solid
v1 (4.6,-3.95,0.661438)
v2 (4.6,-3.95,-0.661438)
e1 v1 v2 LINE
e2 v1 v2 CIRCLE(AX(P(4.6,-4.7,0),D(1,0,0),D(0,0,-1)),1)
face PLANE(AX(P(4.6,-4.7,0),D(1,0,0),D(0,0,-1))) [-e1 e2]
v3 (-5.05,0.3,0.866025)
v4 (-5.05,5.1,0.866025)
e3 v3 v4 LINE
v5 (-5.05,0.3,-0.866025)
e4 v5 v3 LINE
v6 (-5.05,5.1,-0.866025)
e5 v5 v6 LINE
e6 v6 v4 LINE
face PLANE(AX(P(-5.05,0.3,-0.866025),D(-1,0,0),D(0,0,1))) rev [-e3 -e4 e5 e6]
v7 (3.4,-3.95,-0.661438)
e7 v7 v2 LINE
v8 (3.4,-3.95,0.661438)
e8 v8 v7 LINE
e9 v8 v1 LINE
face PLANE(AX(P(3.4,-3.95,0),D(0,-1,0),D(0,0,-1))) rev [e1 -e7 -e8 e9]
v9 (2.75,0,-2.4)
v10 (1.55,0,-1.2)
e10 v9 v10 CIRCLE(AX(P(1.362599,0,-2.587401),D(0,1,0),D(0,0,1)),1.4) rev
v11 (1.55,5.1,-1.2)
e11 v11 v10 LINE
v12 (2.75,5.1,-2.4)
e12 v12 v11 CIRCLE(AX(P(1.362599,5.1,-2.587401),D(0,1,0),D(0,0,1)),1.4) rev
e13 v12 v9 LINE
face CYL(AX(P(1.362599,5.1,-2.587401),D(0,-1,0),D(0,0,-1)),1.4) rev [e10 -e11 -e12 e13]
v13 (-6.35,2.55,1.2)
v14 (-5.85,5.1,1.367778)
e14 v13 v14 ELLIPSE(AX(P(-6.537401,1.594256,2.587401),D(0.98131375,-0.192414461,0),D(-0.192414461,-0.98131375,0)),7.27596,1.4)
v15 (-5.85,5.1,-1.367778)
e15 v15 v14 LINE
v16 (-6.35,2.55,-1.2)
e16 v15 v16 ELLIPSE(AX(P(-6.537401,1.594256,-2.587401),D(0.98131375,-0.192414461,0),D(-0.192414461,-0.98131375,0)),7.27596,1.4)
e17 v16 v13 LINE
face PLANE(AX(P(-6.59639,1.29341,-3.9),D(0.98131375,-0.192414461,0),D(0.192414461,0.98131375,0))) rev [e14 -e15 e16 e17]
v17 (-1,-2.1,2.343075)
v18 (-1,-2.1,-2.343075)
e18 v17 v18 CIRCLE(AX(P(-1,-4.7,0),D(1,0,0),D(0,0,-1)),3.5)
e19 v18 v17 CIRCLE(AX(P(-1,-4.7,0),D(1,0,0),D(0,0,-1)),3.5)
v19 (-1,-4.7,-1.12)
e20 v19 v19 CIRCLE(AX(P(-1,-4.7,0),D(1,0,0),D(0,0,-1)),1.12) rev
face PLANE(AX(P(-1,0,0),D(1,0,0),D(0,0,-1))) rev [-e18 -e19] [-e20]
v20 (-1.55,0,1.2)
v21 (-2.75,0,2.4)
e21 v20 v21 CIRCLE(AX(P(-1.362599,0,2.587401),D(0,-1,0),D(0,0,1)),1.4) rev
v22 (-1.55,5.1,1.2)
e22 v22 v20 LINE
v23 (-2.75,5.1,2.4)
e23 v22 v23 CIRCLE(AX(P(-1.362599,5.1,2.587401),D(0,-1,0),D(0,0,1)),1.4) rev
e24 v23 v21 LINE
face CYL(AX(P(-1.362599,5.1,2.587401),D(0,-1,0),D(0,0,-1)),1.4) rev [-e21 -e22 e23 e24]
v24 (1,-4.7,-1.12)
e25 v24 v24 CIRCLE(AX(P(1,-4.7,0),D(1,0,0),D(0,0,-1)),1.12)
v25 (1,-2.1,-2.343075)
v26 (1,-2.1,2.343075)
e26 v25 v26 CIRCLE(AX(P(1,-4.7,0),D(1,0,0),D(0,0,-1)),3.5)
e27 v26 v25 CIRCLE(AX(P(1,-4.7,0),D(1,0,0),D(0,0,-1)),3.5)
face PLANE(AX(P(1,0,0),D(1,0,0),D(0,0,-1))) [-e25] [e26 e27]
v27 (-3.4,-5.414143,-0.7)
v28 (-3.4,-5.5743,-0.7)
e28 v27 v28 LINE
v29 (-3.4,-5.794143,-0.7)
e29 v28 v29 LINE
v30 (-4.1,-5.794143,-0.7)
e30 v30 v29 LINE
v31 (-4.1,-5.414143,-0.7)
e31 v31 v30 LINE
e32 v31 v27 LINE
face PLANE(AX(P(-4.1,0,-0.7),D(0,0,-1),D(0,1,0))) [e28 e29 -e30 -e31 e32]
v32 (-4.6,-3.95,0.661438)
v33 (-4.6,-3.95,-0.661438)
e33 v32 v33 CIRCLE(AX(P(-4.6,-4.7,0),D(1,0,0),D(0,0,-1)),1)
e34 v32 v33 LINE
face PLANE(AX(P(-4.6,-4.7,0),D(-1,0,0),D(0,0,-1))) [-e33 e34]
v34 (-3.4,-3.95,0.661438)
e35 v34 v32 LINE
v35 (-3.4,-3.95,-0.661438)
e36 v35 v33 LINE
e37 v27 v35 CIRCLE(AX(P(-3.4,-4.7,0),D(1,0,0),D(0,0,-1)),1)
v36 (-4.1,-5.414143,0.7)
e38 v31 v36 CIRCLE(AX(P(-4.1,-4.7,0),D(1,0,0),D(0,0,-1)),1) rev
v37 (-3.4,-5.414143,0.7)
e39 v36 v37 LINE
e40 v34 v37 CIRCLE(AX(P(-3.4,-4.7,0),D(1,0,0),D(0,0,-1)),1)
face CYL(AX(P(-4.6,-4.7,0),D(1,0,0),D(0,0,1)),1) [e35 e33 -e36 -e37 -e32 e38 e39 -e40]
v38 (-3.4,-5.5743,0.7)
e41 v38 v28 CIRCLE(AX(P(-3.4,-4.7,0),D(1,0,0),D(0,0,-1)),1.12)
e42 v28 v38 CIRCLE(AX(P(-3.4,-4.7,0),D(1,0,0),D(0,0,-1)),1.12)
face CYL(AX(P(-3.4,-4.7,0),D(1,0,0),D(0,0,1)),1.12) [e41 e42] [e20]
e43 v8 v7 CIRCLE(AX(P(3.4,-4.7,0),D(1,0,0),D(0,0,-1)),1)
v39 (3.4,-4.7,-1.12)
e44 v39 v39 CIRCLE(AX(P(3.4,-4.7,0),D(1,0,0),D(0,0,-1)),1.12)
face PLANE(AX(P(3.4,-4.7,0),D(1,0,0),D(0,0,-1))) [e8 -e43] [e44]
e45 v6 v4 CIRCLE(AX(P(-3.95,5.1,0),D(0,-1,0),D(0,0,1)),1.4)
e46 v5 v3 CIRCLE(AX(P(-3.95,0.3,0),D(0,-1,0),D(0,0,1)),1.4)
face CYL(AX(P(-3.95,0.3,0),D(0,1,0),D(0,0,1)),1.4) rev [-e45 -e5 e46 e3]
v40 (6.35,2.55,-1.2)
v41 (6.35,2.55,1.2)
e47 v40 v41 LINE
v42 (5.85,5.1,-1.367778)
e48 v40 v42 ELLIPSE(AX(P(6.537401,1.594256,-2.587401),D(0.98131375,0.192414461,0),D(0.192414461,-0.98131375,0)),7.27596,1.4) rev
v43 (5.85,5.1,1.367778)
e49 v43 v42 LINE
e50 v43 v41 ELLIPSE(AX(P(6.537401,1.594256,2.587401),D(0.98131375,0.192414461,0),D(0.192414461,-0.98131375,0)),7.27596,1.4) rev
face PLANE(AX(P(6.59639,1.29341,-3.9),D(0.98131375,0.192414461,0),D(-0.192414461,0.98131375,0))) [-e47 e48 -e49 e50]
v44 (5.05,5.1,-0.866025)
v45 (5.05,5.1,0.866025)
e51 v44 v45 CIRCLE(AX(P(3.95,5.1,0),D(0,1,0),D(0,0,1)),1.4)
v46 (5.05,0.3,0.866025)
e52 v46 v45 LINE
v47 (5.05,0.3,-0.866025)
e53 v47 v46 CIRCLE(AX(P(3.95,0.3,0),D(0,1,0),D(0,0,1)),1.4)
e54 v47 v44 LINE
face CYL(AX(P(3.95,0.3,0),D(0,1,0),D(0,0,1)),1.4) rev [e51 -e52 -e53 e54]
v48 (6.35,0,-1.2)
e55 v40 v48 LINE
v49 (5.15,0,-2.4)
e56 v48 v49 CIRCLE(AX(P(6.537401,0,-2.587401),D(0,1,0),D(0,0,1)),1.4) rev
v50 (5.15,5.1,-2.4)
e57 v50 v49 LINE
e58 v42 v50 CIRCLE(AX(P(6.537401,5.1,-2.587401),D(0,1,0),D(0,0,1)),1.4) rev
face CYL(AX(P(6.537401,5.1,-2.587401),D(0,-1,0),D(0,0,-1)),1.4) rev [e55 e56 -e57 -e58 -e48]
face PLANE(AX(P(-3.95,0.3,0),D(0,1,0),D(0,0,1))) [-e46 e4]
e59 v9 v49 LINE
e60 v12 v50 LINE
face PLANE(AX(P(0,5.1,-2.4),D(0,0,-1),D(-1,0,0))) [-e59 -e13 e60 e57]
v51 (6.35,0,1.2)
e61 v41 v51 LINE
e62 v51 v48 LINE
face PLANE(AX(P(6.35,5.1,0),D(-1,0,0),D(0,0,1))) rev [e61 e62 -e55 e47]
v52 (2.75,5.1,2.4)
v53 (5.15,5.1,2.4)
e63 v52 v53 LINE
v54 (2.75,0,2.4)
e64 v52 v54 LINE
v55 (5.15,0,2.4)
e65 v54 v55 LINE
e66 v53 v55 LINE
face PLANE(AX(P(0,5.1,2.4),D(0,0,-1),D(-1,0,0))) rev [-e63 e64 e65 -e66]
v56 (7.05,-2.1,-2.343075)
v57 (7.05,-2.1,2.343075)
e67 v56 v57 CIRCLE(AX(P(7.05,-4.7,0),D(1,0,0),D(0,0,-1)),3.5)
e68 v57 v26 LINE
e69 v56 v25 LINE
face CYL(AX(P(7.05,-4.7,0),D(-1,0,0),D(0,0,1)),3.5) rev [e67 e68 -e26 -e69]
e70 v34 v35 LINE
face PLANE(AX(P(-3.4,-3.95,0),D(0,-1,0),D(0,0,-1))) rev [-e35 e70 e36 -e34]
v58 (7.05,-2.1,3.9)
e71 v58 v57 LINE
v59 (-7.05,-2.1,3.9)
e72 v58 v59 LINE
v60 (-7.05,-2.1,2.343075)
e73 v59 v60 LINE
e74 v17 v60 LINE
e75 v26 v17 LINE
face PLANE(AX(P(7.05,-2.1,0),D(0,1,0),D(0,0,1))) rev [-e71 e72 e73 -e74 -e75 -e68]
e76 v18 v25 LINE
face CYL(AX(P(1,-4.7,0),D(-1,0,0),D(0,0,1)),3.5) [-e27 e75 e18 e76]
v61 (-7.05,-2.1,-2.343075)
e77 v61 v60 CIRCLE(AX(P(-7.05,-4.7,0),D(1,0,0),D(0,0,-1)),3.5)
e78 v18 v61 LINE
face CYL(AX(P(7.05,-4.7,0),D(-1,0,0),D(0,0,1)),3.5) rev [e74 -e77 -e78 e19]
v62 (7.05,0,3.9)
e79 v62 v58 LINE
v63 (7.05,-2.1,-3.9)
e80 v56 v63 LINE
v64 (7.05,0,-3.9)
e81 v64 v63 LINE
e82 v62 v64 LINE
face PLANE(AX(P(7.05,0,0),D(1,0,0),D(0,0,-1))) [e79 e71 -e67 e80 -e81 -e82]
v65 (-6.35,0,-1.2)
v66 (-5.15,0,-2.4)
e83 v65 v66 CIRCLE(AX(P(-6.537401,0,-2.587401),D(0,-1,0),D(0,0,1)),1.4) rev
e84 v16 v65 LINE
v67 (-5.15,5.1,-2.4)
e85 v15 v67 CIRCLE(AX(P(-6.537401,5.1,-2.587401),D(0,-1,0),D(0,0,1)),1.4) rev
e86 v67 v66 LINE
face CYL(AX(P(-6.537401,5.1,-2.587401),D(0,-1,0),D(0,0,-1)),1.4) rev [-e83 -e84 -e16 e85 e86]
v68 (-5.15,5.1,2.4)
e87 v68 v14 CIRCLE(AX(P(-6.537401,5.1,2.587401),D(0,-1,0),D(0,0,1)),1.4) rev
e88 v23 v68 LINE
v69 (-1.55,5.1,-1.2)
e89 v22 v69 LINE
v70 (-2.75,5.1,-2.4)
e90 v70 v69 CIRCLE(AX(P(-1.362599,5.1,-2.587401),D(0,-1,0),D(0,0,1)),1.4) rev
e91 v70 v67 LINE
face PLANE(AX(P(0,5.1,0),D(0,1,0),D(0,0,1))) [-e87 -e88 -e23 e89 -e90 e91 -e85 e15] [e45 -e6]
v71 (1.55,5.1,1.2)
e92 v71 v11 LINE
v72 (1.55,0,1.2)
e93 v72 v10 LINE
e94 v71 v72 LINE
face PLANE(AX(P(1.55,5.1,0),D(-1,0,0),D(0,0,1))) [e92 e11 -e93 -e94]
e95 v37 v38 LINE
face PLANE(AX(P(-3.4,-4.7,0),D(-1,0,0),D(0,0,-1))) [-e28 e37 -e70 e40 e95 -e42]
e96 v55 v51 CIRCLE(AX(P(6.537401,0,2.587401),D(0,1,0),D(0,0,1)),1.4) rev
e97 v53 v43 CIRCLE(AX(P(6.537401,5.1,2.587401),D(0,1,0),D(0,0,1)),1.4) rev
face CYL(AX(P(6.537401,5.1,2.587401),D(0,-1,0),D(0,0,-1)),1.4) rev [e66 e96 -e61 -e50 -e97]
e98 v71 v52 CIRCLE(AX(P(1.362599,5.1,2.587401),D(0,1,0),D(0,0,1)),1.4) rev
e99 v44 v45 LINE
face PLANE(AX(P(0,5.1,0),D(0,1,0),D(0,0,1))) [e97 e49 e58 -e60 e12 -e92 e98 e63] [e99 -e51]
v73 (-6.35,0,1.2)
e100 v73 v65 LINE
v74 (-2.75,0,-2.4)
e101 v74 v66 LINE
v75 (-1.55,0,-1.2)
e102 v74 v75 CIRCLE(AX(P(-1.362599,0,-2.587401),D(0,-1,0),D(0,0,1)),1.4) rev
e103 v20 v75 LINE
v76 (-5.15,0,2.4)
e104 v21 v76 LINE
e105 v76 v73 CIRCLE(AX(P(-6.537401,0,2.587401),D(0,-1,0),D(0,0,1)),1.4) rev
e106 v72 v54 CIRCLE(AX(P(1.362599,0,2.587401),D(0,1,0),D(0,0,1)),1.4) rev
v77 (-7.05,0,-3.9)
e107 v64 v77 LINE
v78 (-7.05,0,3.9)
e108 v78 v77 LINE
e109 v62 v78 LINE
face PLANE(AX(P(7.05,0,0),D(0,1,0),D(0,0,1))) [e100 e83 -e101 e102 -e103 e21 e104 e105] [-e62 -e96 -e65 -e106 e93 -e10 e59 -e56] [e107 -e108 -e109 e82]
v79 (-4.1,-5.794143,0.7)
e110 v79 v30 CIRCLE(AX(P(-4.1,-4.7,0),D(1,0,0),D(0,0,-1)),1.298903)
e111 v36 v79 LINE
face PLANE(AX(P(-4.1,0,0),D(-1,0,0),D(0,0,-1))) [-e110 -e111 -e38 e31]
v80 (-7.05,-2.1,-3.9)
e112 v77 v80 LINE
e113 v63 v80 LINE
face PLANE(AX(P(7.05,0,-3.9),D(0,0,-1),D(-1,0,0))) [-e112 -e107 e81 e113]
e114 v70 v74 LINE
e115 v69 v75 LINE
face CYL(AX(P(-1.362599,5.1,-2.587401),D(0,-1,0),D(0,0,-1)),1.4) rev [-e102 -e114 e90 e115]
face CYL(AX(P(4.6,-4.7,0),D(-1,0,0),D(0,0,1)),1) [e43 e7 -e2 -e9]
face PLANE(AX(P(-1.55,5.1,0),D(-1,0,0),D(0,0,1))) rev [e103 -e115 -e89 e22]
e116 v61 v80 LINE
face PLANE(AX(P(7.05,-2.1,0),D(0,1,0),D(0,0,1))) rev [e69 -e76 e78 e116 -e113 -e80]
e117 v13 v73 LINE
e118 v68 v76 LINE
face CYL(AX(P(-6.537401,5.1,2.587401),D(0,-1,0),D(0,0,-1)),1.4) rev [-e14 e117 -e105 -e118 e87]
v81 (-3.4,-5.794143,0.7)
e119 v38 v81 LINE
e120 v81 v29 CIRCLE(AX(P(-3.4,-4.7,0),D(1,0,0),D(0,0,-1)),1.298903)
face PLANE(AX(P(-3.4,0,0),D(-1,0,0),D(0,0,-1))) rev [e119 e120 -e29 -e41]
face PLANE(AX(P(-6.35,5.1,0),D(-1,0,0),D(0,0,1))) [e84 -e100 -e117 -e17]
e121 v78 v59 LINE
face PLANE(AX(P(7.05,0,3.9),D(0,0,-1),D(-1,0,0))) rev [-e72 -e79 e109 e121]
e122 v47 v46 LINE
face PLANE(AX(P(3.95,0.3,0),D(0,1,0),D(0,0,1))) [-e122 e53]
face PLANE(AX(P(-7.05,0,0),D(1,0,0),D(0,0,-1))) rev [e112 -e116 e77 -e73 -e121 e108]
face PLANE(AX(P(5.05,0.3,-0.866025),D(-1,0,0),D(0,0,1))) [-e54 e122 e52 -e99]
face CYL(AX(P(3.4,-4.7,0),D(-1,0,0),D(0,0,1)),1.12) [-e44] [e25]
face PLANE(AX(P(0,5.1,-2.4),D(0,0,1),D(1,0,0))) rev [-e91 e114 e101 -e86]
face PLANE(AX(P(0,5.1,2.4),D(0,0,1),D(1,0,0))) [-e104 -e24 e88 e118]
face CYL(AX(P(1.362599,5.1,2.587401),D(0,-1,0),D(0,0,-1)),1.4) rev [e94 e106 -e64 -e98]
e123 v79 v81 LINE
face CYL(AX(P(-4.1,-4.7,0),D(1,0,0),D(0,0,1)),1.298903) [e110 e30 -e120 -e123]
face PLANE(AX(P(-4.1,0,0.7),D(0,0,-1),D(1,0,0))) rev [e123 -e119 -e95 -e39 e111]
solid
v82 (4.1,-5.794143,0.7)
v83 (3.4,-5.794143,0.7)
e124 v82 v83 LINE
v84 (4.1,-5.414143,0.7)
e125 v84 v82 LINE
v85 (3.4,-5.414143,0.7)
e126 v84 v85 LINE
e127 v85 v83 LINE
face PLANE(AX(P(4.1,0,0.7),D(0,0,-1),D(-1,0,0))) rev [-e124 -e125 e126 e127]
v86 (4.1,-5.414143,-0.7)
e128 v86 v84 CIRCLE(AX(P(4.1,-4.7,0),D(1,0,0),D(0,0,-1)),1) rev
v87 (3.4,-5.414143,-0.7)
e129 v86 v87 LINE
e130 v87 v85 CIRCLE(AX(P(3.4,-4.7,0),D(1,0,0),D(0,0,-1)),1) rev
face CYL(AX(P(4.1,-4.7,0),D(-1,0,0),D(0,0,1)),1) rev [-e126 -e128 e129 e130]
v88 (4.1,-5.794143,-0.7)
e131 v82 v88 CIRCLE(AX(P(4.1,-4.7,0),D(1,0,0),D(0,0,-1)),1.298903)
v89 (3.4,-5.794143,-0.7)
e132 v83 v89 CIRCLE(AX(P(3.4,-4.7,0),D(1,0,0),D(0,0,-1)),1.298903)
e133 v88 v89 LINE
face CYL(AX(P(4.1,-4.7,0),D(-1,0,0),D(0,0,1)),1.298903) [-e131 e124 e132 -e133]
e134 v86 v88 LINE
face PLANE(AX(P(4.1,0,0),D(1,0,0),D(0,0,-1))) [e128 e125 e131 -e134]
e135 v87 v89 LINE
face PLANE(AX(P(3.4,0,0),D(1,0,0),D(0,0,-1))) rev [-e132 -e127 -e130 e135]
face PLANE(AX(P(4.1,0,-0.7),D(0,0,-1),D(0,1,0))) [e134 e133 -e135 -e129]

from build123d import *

# Parameters (mm, degrees)
BOSS_EXTRUDE2_DEPTH  = 7.05
SKETCH2_4_R          = 3.5
BOSS_EXTRUDE3_DEPTH  = 1
SKETCH6_R            = 1.12
BOSS_EXTRUDE4_DEPTH  = 2.4
SKETCH7_R            = 1
BOSS_EXTRUDE5_DEPTH  = 1.2
CUT_EXTRUDE1_START   = -1.2
CUT_EXTRUDE1_DEPTH   = 1.2
BOSS_EXTRUDE6_DEPTH  = 0.7
BOSS_EXTRUDE7_DEPTH  = 5.1
CUT_EXTRUDE2_DEPTH   = 4.8
CUT_EXTRUDE3_DEPTH   = 13.515290648
MIRROR10_START       = -4.6
MIRROR10_DEPTH       = 3.6
MIRROR10_START_2     = -3.4
MIRROR10_2_OUTLINE_R = 1.12
MIRROR10_2_DEPTH     = 2.4
MIRROR10_START_3     = -4.1
MIRROR10_3_DEPTH     = 0.7


# Read off the part's stored shape, not the designer's step: Mirror10
with BuildPart() as part:
    # Sketch2 → Boss-Extrude2 (new, symmetric)
    with BuildSketch(Plane(origin=(0, 0, 0), x_dir=(0, 0, -1), z_dir=(1, 0, 0))):
        with BuildLine():
            ThreePointArc((-2.343074903, -2.1), (0, -1.2), (2.343074903, -2.1))
            Line((2.343074903, -2.1), (3.9, -2.1))
            Line((3.9, -2.1), (3.9, 0))
            Line((3.9, 0), (-3.9, 0))
            Line((-3.9, 0), (-3.9, -2.1))
            Line((-3.9, -2.1), (-2.343074903, -2.1))
        make_face()
    extrude(amount=BOSS_EXTRUDE2_DEPTH, both=True)

    # Sketch2<4> → Boss-Extrude3 (add, symmetric)
    with BuildSketch(Plane(origin=(0, 0, 0), x_dir=(0, 0, -1), z_dir=(1, 0, 0))):
        with Locations((0, -4.7)):
            Circle(SKETCH2_4_R)
    extrude(amount=BOSS_EXTRUDE3_DEPTH, both=True)

    # Sketch6 → Boss-Extrude4 (add)
    with BuildSketch(Plane(origin=(1, 0, 0), x_dir=(0, 0, -1), z_dir=(1, 0, 0))):
        with Locations((0, -4.7)):
            Circle(SKETCH6_R)
    extrude(amount=BOSS_EXTRUDE4_DEPTH)

    # Sketch7 → Boss-Extrude5 (add)
    with BuildSketch(Plane(origin=(3.4, 0, 0), x_dir=(0, 0, -1), z_dir=(1, 0, 0))):
        with Locations((0, -4.7)):
            Circle(SKETCH7_R)
    extrude(amount=BOSS_EXTRUDE5_DEPTH)

    # Sketch8 → Cut-Extrude1 (cut)
    with BuildSketch(Plane(origin=(4.6, 0, 0), x_dir=(0, 0, -1), z_dir=(1, 0, 0)).offset(CUT_EXTRUDE1_START)):
        with BuildLine():
            ThreePointArc((0.661437828, -3.95), (0, -3.7), (-0.661437828, -3.95))
            Line((-0.661437828, -3.95), (0.661437828, -3.95))
        make_face()
    extrude(amount=CUT_EXTRUDE1_DEPTH, mode=Mode.SUBTRACT)

    # Sketch12 → Boss-Extrude7 (add)
    with BuildSketch(Plane(origin=(0, 0, 0), x_dir=(1, 0, 0), z_dir=(0, 1, 0))):
        with BuildLine():
            ThreePointArc((1.55, -1.2), (2.352548706, -1.597451294), (2.75, -2.4))
            Line((2.75, -2.4), (5.15, -2.4))
            ThreePointArc((5.15, -2.4), (5.547451294, -1.597451294), (6.35, -1.2))
            Line((6.35, -1.2), (6.35, 1.2))
            ThreePointArc((6.35, 1.2), (5.547451294, 1.597451294), (5.15, 2.4))
            Line((5.15, 2.4), (2.75, 2.4))
            ThreePointArc((2.75, 2.4), (2.352548706, 1.597451294), (1.55, 1.2))
            Line((1.55, 1.2), (1.55, -1.2))
        make_face()
    boss_extrude7 = extrude(amount=BOSS_EXTRUDE7_DEPTH)

    # Sketch13 → Cut-Extrude2 (cut)
    with BuildSketch(Plane(origin=(0, 5.1, 0), x_dir=(1, 0, 0), z_dir=(0, 1, 0))):
        with BuildLine():
            Line((5.05, 0.866025404), (5.05, -0.866025404))
            ThreePointArc((5.05, -0.866025404), (2.55, 0), (5.05, 0.866025404))
        make_face()
    cut_extrude2 = extrude(amount=-CUT_EXTRUDE2_DEPTH, mode=Mode.SUBTRACT)

    # Sketch16 → Cut-Extrude3 (cut, through all)
    with BuildSketch(Plane.XY.offset(2.4)):
        Polygon((5.85, 5.1), (6.35, 5.1), (6.35, 2.55), align=None)
    cut_extrude3 = extrude(amount=-CUT_EXTRUDE3_DEPTH, mode=Mode.SUBTRACT)

    # Mirror6: Boss-Extrude7, Cut-Extrude2 across plane
    add(boss_extrude7.mirror(Plane(origin=(0, 0, 0), x_dir=(0, 0, 1), z_dir=(1, 0, 0))))
    add(cut_extrude2.mirror(Plane(origin=(0, 0, 0), x_dir=(0, 0, 1), z_dir=(1, 0, 0))), mode=Mode.SUBTRACT)

    # Mirror9: Cut-Extrude3 across plane
    add(cut_extrude3.mirror(Plane(origin=(0, 0, 0), x_dir=(0, 0, 1), z_dir=(1, 0, 0))), mode=Mode.SUBTRACT)

    # Mirror10 outline → Mirror10 (add)
    with BuildSketch(Plane.YZ.offset(MIRROR10_START)):
        with BuildLine():
            ThreePointArc((-3.95, 0.661437828), (-5.7, 0), (-3.95, -0.661437828))
            Line((-3.95, -0.661437828), (-3.95, 0.661437828))
        make_face()
    extrude(amount=MIRROR10_DEPTH)

    # Mirror10 2 outline → Mirror10 2 (add)
    with BuildSketch(Plane.YZ.offset(MIRROR10_START_2)):
        with Locations((-4.7, 0)):
            Circle(MIRROR10_2_OUTLINE_R)
        with BuildLine():
            ThreePointArc((-3.95, -0.661437828), (-5.7, 0), (-3.95, 0.661437828))
            Line((-3.95, 0.661437828), (-3.95, -0.661437828))
        make_face(mode=Mode.SUBTRACT)
    extrude(amount=MIRROR10_2_DEPTH)

    # Mirror10 3 outline → Mirror10 3 (add)
    with BuildSketch(Plane.YZ.offset(MIRROR10_START_3)):
        with BuildLine():
            Line((-5.414142843, 0.7), (-5.794142843, 0.7))
            ThreePointArc((-5.794142843, 0.7), (-5.99890283, 0), (-5.794142843, -0.7))
            Line((-5.794142843, -0.7), (-5.414142843, -0.7))
            ThreePointArc((-5.414142843, -0.7), (-5.7, 0), (-5.414142843, 0.7))
        make_face()
    extrude(amount=MIRROR10_3_DEPTH)


with BuildPart() as body_2:
    # Sketch10 → Boss-Extrude6 (new body)
    with BuildSketch(Plane(origin=(3.4, 0, 0), x_dir=(0, 0, -1), z_dir=(1, 0, 0))):
        with BuildLine():
            Line((0, -5.82), (0, -5.7))
            ThreePointArc((0, -5.7), (-0.378058962, -5.625781519), (-0.7, -5.414142843))
            Line((-0.7, -5.414142843), (-0.7, -5.57429972))
            ThreePointArc((-0.7, -5.57429972), (-0.370934168, -5.756791296), (0, -5.82))
        make_face()
        with BuildLine():
            ThreePointArc((0.7, -5.414142843), (0.378058962, -5.625781519), (0, -5.7))
            Line((0, -5.7), (0, -5.82))
            ThreePointArc((0, -5.82), (0.370934168, -5.756791296), (0.7, -5.57429972))
            Line((0.7, -5.57429972), (0.7, -5.414142843))
        make_face()
        with BuildLine():
            ThreePointArc((0.7, -5.57429972), (0.370934168, -5.756791296), (0, -5.82))
            Line((0, -5.82), (0, -5.99890283))
            ThreePointArc((0, -5.99890283), (0.364666509, -5.946662303), (0.7, -5.794142843))
            Line((0.7, -5.794142843), (0.7, -5.57429972))
        make_face()
        with BuildLine():
            Line((0, -5.99890283), (0, -5.82))
            ThreePointArc((0, -5.82), (-0.370934168, -5.756791296), (-0.7, -5.57429972))
            Line((-0.7, -5.57429972), (-0.7, -5.794142843))
            ThreePointArc((-0.7, -5.794142843), (-0.364666509, -5.946662303), (0, -5.99890283))
        make_face()
    extrude(amount=BOSS_EXTRUDE6_DEPTH)


solid = Compound([part.part, body_2.part])
